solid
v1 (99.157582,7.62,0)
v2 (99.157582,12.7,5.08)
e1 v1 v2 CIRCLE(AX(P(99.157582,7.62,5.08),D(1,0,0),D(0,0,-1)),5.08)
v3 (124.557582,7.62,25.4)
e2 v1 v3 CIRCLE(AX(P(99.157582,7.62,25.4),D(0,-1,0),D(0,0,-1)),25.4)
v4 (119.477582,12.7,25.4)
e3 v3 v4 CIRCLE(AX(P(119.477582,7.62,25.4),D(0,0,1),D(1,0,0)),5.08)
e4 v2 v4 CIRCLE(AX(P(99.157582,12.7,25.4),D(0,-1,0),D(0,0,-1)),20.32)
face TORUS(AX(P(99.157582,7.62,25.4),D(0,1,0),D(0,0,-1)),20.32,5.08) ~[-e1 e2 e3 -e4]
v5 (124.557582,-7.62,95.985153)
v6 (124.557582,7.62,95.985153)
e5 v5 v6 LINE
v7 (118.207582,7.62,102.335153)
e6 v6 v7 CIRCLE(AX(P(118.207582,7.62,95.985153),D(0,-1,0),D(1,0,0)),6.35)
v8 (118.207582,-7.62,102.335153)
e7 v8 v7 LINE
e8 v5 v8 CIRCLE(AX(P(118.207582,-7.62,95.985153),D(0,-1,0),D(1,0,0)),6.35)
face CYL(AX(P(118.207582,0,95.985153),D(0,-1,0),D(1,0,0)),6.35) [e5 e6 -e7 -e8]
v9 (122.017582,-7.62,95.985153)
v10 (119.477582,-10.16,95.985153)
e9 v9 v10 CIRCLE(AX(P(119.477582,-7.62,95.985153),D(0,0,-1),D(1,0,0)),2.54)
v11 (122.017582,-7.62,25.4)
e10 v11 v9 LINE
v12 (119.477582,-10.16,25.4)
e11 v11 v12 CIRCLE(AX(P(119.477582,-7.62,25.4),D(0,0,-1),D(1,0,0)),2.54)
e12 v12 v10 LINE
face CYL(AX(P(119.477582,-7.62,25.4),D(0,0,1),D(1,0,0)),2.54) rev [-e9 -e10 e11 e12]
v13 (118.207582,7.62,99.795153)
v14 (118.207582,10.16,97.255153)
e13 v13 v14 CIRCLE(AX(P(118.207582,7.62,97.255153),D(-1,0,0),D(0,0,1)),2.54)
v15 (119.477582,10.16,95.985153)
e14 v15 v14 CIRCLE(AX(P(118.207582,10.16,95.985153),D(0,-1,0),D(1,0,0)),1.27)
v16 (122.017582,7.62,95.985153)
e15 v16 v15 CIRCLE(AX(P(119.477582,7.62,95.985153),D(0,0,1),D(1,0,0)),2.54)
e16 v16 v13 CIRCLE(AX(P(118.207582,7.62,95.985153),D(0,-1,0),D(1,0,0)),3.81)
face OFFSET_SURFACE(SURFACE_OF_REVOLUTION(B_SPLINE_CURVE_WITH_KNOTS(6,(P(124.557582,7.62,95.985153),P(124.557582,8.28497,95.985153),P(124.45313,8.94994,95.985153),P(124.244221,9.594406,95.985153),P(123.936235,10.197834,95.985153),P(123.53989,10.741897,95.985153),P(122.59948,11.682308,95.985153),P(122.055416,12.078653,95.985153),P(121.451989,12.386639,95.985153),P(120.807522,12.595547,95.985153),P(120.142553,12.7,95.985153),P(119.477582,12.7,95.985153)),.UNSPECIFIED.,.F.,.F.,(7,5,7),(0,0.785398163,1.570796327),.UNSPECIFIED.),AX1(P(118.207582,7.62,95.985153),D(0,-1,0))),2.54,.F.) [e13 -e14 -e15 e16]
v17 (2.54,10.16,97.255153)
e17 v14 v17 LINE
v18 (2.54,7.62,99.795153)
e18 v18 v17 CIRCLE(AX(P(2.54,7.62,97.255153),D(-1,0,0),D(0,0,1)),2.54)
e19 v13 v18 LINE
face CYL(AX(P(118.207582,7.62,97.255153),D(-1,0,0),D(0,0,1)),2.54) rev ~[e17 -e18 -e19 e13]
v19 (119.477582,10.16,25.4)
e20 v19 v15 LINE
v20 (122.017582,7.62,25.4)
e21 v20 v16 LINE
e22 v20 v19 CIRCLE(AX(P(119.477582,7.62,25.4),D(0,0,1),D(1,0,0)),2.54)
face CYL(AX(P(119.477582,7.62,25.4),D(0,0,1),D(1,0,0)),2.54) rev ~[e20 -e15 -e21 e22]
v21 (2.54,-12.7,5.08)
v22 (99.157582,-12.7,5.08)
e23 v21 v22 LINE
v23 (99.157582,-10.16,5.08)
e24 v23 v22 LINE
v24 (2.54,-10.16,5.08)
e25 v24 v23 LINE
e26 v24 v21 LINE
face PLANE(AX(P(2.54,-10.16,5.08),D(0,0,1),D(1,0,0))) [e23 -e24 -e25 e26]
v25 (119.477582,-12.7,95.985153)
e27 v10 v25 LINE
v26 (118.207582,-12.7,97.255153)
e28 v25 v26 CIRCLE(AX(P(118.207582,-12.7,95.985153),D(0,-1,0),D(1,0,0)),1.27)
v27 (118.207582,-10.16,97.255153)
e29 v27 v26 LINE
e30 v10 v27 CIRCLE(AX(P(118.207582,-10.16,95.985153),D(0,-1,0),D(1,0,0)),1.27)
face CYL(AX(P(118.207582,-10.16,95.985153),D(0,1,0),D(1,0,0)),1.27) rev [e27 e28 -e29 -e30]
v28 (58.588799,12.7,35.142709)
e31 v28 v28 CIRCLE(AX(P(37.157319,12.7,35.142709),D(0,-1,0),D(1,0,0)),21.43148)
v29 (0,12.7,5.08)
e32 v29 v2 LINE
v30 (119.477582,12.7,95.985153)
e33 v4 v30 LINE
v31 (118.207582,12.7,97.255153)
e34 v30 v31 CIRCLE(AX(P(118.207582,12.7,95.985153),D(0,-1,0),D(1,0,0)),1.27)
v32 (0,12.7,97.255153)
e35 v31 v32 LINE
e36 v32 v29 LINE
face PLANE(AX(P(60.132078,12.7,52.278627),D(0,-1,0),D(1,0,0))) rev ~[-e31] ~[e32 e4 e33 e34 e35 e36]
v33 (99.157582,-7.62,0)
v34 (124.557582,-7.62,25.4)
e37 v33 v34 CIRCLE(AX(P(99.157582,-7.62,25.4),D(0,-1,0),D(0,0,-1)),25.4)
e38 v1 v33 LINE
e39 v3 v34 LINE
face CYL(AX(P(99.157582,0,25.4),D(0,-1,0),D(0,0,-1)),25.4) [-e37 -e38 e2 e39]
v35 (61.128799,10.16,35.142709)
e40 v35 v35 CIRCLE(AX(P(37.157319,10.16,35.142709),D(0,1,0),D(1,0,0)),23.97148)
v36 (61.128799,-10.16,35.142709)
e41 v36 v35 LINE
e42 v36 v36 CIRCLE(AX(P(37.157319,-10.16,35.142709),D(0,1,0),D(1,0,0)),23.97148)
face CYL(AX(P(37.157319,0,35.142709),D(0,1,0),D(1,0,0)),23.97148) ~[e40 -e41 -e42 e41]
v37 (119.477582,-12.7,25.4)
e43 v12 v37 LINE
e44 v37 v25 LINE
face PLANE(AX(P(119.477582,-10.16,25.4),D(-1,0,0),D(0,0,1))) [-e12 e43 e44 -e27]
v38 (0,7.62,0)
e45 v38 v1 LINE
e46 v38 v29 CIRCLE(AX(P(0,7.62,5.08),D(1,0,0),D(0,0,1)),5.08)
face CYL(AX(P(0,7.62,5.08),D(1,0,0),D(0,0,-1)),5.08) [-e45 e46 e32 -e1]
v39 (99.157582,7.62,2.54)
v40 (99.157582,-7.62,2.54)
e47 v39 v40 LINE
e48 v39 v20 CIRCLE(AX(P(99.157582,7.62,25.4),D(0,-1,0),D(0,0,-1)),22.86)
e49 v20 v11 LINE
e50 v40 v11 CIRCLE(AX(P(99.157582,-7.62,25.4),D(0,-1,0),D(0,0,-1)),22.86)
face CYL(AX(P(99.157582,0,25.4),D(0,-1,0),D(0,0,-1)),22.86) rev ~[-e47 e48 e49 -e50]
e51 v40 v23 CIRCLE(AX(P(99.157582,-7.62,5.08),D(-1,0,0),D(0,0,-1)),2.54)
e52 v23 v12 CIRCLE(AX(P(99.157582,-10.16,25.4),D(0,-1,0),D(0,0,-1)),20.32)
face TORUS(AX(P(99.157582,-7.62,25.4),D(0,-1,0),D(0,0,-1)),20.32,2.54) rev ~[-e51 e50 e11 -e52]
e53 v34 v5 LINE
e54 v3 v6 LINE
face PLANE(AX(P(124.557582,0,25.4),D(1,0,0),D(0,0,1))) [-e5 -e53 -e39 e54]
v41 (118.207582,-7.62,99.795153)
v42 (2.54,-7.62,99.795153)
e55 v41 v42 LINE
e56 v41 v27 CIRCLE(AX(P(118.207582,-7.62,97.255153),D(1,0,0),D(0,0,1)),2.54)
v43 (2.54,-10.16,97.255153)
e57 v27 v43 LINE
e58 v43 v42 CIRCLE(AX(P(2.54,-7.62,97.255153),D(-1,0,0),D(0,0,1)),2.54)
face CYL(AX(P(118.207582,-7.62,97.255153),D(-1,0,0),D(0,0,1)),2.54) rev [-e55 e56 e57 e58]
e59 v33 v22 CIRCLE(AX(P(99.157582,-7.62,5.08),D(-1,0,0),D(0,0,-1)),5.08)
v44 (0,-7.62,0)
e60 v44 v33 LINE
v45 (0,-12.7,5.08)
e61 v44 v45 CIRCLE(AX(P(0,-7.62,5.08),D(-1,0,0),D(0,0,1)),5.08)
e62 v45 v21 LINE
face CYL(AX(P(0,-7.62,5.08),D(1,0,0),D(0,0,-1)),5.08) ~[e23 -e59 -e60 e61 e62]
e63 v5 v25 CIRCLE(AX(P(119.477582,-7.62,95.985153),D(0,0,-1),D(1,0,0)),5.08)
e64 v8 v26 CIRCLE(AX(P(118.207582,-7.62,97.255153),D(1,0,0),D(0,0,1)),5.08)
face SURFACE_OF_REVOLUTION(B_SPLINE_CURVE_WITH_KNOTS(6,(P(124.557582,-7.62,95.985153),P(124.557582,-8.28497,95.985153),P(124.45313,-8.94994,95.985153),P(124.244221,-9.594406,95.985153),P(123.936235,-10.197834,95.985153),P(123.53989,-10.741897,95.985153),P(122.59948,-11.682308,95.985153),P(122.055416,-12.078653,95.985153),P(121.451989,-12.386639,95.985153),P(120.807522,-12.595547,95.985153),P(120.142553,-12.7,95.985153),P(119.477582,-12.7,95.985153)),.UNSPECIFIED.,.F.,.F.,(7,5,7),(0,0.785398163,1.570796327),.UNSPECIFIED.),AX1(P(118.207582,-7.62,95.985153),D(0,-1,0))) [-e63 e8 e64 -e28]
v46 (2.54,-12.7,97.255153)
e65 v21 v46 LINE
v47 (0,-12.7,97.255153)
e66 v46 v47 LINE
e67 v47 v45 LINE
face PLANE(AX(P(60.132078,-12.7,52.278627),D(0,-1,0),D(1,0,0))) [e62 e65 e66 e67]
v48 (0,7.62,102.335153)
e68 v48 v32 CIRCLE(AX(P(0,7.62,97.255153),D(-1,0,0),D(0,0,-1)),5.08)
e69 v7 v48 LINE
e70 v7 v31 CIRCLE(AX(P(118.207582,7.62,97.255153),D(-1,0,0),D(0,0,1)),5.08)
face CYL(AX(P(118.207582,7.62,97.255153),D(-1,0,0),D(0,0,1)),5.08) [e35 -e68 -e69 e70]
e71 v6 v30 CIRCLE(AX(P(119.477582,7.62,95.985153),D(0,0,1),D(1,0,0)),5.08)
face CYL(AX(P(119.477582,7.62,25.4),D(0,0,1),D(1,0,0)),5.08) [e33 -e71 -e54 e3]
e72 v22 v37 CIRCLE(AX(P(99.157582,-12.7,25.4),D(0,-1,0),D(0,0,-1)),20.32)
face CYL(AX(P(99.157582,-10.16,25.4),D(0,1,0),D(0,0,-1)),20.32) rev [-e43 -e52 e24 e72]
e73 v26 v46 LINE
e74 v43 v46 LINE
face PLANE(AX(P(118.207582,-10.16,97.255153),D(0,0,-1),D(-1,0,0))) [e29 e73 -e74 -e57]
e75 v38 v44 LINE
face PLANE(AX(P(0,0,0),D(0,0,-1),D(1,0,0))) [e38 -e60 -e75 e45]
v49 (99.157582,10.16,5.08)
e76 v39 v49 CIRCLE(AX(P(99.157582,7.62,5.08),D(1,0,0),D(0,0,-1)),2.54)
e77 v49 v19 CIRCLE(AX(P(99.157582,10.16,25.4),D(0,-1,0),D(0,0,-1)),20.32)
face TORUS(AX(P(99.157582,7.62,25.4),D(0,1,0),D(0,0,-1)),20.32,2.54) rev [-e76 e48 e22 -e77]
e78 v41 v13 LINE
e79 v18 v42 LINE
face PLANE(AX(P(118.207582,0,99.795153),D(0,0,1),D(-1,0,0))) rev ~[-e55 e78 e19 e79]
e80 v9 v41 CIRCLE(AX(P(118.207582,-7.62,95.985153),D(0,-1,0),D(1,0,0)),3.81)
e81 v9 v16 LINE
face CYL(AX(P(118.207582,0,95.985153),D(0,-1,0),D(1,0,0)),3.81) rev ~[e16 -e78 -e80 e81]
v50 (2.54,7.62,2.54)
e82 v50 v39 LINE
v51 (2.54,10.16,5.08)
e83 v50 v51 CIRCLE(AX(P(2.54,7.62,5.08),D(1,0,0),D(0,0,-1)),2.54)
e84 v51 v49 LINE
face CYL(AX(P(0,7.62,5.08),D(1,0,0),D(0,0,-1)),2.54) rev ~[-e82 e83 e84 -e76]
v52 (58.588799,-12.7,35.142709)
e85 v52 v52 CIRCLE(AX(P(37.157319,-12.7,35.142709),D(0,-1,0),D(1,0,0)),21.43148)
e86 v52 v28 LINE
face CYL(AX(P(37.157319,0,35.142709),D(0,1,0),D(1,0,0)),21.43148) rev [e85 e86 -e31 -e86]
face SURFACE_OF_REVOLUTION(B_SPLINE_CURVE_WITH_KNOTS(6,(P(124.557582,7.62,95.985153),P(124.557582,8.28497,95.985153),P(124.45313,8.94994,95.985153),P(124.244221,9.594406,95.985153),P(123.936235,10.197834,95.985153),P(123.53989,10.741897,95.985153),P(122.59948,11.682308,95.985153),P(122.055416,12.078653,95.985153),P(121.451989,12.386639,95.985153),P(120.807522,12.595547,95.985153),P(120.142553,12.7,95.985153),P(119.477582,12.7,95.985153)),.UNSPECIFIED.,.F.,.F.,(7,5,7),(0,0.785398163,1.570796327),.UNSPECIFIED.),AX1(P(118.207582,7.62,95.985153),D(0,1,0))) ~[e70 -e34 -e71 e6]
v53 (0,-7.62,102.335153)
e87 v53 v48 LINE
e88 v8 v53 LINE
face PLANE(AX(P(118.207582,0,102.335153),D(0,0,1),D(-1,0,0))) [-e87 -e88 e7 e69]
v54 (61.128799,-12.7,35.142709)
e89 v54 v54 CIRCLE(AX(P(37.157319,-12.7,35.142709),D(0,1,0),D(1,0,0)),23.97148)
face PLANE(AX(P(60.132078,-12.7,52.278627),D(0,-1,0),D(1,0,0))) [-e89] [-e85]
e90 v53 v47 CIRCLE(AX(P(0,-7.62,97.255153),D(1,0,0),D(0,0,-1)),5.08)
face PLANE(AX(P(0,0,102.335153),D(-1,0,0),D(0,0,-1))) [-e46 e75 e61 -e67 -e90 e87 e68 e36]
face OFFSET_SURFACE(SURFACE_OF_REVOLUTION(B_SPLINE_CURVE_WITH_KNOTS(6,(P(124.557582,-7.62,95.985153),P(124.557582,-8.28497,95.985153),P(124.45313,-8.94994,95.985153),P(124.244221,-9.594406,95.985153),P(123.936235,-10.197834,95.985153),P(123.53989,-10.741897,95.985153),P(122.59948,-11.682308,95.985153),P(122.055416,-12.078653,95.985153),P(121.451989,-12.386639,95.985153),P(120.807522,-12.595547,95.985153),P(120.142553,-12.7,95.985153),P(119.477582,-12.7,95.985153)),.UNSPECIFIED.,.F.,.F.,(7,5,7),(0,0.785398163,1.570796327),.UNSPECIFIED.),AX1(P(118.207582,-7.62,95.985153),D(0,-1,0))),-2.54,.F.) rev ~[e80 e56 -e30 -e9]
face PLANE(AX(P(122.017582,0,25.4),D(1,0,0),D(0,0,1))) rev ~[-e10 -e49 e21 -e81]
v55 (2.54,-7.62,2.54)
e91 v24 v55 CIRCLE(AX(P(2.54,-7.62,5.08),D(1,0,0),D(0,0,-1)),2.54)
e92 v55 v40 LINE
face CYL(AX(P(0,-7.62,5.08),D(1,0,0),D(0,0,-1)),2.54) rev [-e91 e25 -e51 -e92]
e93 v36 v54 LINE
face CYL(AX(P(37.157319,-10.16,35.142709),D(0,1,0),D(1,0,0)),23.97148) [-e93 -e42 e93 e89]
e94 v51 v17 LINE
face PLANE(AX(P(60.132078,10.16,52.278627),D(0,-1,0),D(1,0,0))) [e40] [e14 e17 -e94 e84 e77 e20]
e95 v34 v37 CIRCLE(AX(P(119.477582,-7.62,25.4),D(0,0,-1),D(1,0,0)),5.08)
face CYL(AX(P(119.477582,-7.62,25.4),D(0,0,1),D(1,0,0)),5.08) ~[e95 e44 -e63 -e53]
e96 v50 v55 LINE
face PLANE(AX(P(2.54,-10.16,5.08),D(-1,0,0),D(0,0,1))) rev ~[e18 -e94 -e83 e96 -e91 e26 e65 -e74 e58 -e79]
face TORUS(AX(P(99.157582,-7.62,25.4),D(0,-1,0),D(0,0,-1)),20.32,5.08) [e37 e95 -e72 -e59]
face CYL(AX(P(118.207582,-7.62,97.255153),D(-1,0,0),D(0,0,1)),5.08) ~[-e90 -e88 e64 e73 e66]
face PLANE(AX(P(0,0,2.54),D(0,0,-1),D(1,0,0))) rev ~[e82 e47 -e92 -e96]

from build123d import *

# Parameters (mm, degrees)
F0_R     = 21.4314801072
F1_DEPTH = 12.7
F2_R     = 5.08
F3_T     = -2.54


# Not quite as in the source:
# - a shell that OpenCascade refuses in one call is made with other operations: the cavity is built on its own and cut out


with BuildPart() as f1:
    # F0 (on Front) → F1 (new body, symmetric)
    with BuildSketch(Plane.XZ):
        with BuildLine():
            Line((0, 102.3351529121), (0, 0))
            Line((0, 0), (99.1575824261, 0))
            ThreePointArc((99.1575824261, 0), (117.1180946682, 7.4394877579), (124.5575824261, 25.4))
            Line((124.5575824261, 25.4), (124.5575824261, 95.9851529121))
            ThreePointArc((124.5575824261, 95.9851529121), (122.6977104866, 100.4752809727), (118.2075824261, 102.3351529121))
            Line((118.2075824261, 102.3351529121), (0, 102.3351529121))
        make_face()
        with Locations((37.157318583, 35.142709024)):
            Circle(F0_R, mode=Mode.SUBTRACT)
    extrude(amount=F1_DEPTH, both=True)

    # F2
    f2_edges = [f1.edges().sort_by_distance(p)[0] for p in [
        (59.103791, 12.7, 102.335153),
        (59.103791, -12.7, 102.335153),
    ]]
    fillet(f2_edges, radius=F2_R)

    # F3: a shell. OpenCascade refuses it in one call, so the cavity is built on its own and cut out:
    # the body offset inwards by the wall thickness, plus a prism from it out through each open face.
    f3_core = offset(f1.part, amount=F3_T, mode=Mode.PRIVATE)
    f3_exits = [f3_core.faces().sort_by_distance(p)[0] for p in [
        (65.31507, -10.16, 54.836293),
    ]]
    add(f3_core, mode=Mode.SUBTRACT)
    extrude(f3_exits, amount=-F3_T, mode=Mode.SUBTRACT)


solid = f1.part
